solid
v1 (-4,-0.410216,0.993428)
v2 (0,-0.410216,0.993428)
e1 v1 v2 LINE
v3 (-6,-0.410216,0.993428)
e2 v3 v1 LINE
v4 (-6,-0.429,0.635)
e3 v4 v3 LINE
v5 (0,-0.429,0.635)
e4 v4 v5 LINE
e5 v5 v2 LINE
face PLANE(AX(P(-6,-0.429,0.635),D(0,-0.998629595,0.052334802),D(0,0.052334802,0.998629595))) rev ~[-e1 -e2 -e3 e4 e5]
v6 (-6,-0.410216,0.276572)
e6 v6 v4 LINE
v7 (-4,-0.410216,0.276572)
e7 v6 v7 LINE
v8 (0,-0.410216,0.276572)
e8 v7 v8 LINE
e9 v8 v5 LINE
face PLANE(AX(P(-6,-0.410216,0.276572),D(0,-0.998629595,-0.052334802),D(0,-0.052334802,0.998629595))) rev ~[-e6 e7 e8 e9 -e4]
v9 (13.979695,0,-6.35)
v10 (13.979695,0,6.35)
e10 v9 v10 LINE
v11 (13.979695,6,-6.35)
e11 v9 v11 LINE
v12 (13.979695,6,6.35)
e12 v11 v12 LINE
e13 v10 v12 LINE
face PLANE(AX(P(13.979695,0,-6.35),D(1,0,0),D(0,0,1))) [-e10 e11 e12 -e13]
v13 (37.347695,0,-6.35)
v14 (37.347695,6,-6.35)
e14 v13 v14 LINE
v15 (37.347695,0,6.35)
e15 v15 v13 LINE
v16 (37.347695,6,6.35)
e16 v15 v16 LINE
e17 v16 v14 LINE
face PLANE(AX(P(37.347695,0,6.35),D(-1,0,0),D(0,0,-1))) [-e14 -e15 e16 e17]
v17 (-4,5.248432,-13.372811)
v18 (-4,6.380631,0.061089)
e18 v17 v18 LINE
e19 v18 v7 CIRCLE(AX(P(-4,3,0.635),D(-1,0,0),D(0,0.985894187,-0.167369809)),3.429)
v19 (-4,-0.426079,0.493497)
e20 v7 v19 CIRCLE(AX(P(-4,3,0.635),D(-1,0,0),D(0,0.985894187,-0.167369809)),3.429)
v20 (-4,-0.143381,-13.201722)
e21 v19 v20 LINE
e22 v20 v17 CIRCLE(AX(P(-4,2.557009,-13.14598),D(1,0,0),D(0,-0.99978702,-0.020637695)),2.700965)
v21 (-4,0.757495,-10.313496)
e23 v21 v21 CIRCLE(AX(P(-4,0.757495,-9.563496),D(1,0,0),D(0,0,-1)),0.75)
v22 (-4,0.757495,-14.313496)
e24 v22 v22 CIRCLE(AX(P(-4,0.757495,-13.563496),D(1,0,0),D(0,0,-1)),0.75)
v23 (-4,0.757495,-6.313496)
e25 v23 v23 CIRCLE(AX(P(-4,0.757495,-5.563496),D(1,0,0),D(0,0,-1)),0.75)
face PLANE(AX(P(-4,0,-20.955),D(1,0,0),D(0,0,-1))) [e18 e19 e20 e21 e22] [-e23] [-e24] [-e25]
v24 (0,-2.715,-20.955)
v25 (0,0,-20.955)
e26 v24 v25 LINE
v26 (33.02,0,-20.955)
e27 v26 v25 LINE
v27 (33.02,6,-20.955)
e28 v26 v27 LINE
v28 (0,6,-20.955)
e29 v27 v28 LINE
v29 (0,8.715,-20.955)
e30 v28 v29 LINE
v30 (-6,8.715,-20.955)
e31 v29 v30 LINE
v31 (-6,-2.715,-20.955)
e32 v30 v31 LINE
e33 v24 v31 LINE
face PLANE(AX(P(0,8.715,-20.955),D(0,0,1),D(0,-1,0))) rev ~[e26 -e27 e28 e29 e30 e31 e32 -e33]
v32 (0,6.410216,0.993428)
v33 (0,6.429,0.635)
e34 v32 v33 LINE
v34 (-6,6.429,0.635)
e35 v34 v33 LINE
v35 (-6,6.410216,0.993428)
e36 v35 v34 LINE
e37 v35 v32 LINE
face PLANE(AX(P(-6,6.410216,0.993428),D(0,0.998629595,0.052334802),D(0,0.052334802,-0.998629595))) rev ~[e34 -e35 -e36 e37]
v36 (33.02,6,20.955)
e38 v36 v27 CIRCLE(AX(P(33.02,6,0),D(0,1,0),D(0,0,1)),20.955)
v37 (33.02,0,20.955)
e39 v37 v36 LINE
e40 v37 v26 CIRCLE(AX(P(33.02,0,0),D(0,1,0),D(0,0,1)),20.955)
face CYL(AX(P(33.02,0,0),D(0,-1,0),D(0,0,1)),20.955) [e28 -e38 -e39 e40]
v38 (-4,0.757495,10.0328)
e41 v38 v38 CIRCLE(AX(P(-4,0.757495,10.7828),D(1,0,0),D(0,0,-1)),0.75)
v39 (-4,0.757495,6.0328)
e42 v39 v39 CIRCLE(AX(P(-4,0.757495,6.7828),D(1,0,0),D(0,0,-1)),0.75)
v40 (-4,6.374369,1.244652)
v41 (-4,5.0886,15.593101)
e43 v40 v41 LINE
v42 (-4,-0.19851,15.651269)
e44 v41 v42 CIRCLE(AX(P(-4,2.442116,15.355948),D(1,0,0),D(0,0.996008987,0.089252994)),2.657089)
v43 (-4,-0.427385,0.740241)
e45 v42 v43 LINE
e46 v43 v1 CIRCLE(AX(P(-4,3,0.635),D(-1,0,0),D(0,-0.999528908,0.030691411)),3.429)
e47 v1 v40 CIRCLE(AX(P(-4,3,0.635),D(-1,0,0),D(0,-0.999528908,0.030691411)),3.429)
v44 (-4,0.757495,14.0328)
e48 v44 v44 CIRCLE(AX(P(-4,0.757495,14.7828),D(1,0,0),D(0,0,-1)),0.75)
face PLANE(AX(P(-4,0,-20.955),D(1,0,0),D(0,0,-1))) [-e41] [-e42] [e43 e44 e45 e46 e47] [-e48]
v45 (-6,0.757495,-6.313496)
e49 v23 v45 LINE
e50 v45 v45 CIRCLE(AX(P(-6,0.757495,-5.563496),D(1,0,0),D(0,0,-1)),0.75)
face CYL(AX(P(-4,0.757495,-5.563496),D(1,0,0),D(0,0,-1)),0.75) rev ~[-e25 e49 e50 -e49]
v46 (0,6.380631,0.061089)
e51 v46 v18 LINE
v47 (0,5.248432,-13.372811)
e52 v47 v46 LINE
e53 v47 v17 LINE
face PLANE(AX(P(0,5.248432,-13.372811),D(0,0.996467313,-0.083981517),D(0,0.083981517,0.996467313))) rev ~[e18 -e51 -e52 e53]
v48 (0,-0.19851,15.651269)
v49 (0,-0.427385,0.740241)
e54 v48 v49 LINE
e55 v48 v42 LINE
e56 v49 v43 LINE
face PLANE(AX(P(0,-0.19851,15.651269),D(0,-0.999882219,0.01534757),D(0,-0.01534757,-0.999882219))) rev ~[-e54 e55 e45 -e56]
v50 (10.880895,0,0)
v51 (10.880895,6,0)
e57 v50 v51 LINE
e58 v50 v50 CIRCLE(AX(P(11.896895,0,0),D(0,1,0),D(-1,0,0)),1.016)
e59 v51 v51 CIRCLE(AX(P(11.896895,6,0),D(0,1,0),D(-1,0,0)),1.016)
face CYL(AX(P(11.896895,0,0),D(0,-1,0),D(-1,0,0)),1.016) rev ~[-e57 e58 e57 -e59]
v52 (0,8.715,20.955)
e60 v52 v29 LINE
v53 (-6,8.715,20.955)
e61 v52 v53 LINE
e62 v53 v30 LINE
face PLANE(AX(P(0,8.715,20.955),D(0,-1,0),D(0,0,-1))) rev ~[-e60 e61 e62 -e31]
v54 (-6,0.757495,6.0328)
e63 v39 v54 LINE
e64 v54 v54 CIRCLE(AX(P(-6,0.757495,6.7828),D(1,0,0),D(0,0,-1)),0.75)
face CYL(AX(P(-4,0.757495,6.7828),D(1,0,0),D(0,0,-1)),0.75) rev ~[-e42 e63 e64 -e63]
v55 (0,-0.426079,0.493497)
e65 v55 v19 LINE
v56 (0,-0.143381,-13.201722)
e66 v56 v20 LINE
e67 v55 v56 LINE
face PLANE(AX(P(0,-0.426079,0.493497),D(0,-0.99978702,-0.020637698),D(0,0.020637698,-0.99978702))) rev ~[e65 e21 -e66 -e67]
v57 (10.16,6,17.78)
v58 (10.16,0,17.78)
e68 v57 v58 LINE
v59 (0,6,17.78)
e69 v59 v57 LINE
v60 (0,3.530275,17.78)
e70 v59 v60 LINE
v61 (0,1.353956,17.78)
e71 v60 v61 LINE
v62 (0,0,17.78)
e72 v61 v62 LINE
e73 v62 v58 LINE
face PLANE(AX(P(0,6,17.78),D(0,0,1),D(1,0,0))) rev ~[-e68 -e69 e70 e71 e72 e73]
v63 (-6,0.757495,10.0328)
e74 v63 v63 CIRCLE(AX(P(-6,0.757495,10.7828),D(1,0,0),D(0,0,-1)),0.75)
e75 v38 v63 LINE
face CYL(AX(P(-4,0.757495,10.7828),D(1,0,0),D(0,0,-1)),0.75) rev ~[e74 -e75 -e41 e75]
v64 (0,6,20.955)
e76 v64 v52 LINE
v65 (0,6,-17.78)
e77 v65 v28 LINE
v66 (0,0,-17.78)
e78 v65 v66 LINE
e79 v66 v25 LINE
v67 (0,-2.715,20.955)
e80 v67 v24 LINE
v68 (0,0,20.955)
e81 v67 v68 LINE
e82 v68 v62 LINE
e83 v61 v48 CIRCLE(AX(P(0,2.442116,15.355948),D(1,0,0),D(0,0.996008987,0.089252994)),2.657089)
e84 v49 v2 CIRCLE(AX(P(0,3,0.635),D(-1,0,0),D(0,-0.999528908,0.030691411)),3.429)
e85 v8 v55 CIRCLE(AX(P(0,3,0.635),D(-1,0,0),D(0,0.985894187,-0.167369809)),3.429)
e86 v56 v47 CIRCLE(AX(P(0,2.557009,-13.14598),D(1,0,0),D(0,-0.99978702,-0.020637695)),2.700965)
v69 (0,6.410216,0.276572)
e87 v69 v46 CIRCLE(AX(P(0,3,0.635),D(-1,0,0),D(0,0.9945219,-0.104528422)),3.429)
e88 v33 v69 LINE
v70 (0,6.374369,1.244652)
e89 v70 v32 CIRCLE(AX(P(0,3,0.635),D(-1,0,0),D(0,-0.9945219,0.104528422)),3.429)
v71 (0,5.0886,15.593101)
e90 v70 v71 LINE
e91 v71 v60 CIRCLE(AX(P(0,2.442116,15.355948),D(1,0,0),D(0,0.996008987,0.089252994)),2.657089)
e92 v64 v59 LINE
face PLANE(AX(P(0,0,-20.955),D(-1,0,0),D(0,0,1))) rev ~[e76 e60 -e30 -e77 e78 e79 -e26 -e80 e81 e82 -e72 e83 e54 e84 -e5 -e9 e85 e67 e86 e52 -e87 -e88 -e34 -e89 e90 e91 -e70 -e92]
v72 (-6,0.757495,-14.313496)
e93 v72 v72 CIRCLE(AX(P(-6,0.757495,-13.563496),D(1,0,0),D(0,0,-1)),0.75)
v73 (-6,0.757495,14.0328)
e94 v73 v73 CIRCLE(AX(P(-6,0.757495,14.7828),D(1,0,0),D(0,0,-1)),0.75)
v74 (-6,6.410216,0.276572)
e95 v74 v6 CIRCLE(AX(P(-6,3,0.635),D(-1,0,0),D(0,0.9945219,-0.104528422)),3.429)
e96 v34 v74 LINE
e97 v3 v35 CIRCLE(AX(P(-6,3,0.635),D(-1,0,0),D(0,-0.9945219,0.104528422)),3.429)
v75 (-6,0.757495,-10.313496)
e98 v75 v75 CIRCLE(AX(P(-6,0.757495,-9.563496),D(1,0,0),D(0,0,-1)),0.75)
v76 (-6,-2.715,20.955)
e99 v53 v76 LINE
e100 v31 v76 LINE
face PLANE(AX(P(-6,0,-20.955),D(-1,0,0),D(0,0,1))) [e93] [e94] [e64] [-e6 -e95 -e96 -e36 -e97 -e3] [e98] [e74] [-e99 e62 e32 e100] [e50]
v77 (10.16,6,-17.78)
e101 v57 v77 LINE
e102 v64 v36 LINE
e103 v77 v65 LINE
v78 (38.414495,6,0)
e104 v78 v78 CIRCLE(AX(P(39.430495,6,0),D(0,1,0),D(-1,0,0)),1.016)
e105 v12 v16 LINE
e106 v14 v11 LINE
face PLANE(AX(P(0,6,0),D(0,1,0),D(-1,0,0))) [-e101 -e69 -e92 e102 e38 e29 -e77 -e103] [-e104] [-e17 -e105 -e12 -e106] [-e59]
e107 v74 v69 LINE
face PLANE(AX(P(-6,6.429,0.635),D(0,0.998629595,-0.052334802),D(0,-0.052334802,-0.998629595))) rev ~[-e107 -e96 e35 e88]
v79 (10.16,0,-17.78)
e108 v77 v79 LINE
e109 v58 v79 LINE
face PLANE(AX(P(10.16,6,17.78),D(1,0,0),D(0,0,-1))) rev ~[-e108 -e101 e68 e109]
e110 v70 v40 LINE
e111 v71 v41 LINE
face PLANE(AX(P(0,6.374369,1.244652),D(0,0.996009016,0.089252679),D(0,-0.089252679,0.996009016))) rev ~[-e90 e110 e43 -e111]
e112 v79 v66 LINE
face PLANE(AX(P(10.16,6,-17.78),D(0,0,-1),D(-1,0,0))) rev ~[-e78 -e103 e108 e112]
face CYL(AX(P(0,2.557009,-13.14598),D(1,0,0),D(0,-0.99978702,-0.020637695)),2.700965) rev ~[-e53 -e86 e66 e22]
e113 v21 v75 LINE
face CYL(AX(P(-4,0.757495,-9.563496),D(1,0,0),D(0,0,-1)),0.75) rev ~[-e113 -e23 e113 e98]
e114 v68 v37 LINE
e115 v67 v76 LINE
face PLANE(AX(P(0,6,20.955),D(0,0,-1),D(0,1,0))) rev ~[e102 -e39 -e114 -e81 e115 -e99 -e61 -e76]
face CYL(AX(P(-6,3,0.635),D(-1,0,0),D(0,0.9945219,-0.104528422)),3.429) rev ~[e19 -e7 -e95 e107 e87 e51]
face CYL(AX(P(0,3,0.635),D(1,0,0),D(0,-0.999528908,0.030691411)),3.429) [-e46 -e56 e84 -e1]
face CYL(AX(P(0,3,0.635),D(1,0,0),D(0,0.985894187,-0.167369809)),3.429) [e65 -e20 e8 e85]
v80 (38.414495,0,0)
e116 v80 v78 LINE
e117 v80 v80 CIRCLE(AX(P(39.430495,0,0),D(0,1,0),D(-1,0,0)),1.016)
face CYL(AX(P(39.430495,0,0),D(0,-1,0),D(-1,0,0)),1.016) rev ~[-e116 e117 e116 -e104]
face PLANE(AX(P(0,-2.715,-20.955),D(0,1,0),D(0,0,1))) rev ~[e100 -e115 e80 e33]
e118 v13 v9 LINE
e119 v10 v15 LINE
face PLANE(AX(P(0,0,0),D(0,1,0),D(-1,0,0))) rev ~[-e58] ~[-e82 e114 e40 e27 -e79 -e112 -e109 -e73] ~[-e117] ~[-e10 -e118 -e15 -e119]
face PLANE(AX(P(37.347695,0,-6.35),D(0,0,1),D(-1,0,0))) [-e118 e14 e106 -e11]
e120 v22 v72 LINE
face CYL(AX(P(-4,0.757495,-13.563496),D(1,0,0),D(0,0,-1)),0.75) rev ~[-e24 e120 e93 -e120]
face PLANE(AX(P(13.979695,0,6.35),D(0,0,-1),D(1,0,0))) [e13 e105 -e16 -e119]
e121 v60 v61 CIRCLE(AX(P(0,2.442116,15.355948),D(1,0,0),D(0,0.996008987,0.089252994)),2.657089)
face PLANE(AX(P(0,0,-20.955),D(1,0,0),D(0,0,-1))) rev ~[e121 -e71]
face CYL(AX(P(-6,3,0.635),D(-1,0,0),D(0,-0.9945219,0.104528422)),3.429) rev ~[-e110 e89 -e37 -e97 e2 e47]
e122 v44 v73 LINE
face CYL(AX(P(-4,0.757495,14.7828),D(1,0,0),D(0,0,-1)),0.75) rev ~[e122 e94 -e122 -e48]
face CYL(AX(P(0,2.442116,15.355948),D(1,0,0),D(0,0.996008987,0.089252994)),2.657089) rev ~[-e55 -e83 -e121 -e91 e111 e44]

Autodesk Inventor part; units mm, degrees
ref_plane "YZ Plane" through (0, 0, 0) normal (1, 0, 0) x (0, 1, 0)
ref_plane "XZ Plane" through (0, 0, 0) normal (0, 1, 0) x (-1, 0, 0)
ref_plane "XY Plane" through (0, 0, 0) normal (0, 0, 1) x (1, 0, 0)
sketch "Sketch1" plane through (0, 0, 0) normal (0, 1, 0) x (-1, 0, 0)
  arc A0 (-33.02, 20.955) -> (-33.02, -20.955) centre (-33.02, 0) ccw
  line L0 (0, 20.955) -> (-33.02, 20.955)
  line L1 (-33.02, -20.955) -> (0, -20.955)
  line L2 (-13.979695, 6.35) -> (-37.347695, 6.35)
  line L3 (-37.347695, 6.35) -> (-37.347695, -6.35)
  line L4 (-37.347695, -6.35) -> (-13.979695, -6.35)
  line L5 (-13.979695, -6.35) -> (-13.979695, 6.35)
  circle A1 centre (-39.430495, 0) radius 1.016
  circle A2 centre (-11.896895, 0) radius 1.016
  line L6 (0, 20.955) -> (0, -20.955)
  point P0 (0, 0)
  point P1 (0, 0)
  point P2 (-37.347695, 0)
  dimension "d1" = 41.91
  dimension "d3" = 12.7
  dimension "d4" = 23.368
  dimension "d5" = 2.032
  dimension "d6" = 2.032
  dimension "d7" = 2.0828
  dimension "d8" = 2.0828
  dimension "d9" = 6.4105
  dimension "d87" = 33.02
  dimension "d88" = 33.02
extrude "Extrusion1" add sketch "Sketch1" along normal blind 6
sketch "Sketch4" plane through (0, 0, -20.955) normal (-1, 0, 0) x (0, 0, 1)
  line L0 (41.91, 8.715) -> (0, 8.715)
  line L1 (0, 8.715) -> (0, -2.715)
  line L2 (0, -2.715) -> (41.91, -2.715)
  line L3 (41.91, -2.715) -> (41.91, 8.715)
  line L4 (0, 0) -> (41.91, 0) projected
  line L5 (41.91, 0) -> (41.91, 6) projected
  point P0 (20.955, 0)
  point P1 (20.955, -2.715)
  point P2 (20.955, 0)
  point P3 (41.91, 3)
  point P4 (41.91, 3)
  dimension "d43" = 41.91
  dimension "d44" = 11.43
extrude "Extrusion4" add sketch "Sketch4" along normal blind 6
sketch "Sketch8" plane through (0, 6, 0) normal (0, 1, 0) x (1, 0, 0)
  line L0 (0, -17.78) -> (10.16, -17.78)
  line L1 (10.16, -17.78) -> (10.16, 17.78)
  line L2 (10.16, 17.78) -> (0, 17.78)
  line L3 (0, 17.78) -> (0, -17.78)
  line L4 (0, -20.955) -> (0, 20.955) projected
  point P0 (0, 0)
  point P1 (0, 0)
  point P2 (0, 0)
  point P3 (0, 0)
  point P4 (0, 0)
  point P5 (0, 0)
  dimension "d74" = 10.16
  dimension "d75" = 35.56
extrude "Extrusion10" cut sketch "Sketch8" against normal blind 16.999991
sketch "Sketch12" plane through (-6, 0, -20.955) normal (-1, 0, 0) x (0, 0, 1)
  line L0 (0, 8.715) -> (0, -2.715)
  line L1 (41.91, -2.715) -> (41.91, 8.715)
  arc A0 (35.512447, 0.300645) -> (35.512447, 5.699355) centre (35.37098, 3) ccw
  line L2 (21.59, -0.429) -> (35.512447, 0.300645)
  line L3 (21.59, 6.429) -> (35.512447, 5.699355)
  circle A1 centre (21.59, 3) radius 3.429
  line L4 (21.59, -0.429) -> (6.703499, 0.351168)
  line L5 (21.59, 6.429) -> (6.703499, 5.648832)
  arc A2 (6.703499, 5.648832) -> (6.703499, 0.351168) centre (6.842318, 3) ccw
  circle A3 centre (15.187051, 3) radius 0.75
  circle A4 centre (11.187051, 3) radius 0.75
  circle A5 centre (7.187051, 3) radius 0.75
  line L6 (21.59, 10.756719) -> (21.59, -4.756719)
  circle A6 centre (27.992949, 3) radius 0.75
  circle A7 centre (31.992949, 3) radius 0.75
  circle A8 centre (35.992949, 3) radius 0.75
  point P0 (34.925, 2)
  point P1 (34.925, 2)
  point P2 (34.925, 2)
  point P3 (14.859, -1.175)
  point P4 (14.859, 5.175)
  point P5 (34.925, 2)
  point P6 (41.91, 3)
  point P7 (38.07404, 3)
  point P8 (41.91, 3)
  point P9 (21.231572, 6.410216)
  point P10 (21.231572, -0.410216)
  point P11 (21.948428, -0.410216)
  point P12 (21.948428, 6.410216)
  point P13 (6.205131, 2.479358)
  point P14 (9.863981, 3)
  point P15 (5.48634, 2.396716)
  point P16 (4.189851, 3)
  point P17 (0, 3)
  point P18 (0, 3)
  point P19 (41.91, 3)
  dimension "d143" = 6
  dimension "d144" = 6.858
  dimension "d145" = 6
  dimension "d146" = 13.78098
  dimension "d147" = 20.32
  dimension "d156" = 1.5
  dimension "d157" = 1.5
  dimension "d158" = 1.5
  dimension "d159" = 4
  dimension "d160" = 4
  dimension "d161" = 2.9972
  dimension "d162" = 17.40015
sketch "Sketch12 outline for Extrusion13" plane through (-6, 0, -20.955) normal (-1, 0, 0) x (0, 0, 1)
  line L0 (21.59, 6.429) -> (21.231572, 6.410216)
  line L1 (21.948428, 6.410216) -> (21.59, 6.429)
  arc A0 (21.948428, -0.410216) -> (21.948428, 6.410216) centre (21.59, 3) ccw
  line L2 (21.59, -0.429) -> (21.948428, -0.410216)
  line L3 (21.231572, -0.410216) -> (21.59, -0.429)
  arc A1 (21.231572, 6.410216) -> (21.231572, -0.410216) centre (21.59, 3) ccw
extrude "Extrusion13" cut sketch "Sketch12 outline for Extrusion13" against normal blind 8.762492
sketch "Sketch17" plane through (0, 0, -20.955) normal (1, 0, 0) x (0, 0, -1)
  arc A0 (-7.753278, -0.143381) -> (-7.582189, 5.248432) centre (-7.80902, 2.557009) ccw
  line L0 (-21.59, -0.429) -> (-7.753278, -0.143381)
  line L1 (-21.59, 6.429) -> (-7.582189, 5.248432)
  circle A1 centre (-21.59, 3) radius 3.429
  line L2 (-21.59, -0.429) -> (-36.606269, -0.19851)
  line L3 (-21.59, 6.429) -> (-36.548101, 5.0886)
  arc A2 (-36.548101, 5.0886) -> (-36.606269, -0.19851) centre (-36.310948, 2.442116) ccw
  arc A3 (-21.231572, -0.410216) -> (-21.231572, 6.410216) centre (-21.59, 3) ccw
  circle A4 centre (-27.970676, 2.471347) radius 0.75
  circle A5 centre (-31.970676, 2.471347) radius 0.75
  circle A6 centre (-35.970676, 2.471347) radius 0.75
  line L4 (-21.59, 6.429) -> (-21.59, -0.429)
  circle A7 centre (-15.209324, 2.471347) radius 0.75
  circle A8 centre (-11.209324, 2.471347) radius 0.75
  circle A9 centre (-7.209324, 2.471347) radius 0.75
  point P0 (-20.955, 0)
  point P1 (-16.352581, -1.161112)
  point P2 (-16.352581, 5.188888)
  point P3 (-5.109414, 2.471347)
  point P4 (-21.695241, -0.427385)
  point P5 (-22.199652, 6.374369)
  point P6 (-21.016089, 6.380631)
  point P7 (-21.448497, -0.426079)
  point P8 (-30.453399, 2.232188)
  point P9 (-26.794548, 2.471347)
  point P10 (-31.172189, 2.149546)
  point P11 (-38.967876, 2.471347)
  dimension "d150" = 6
  dimension "d151" = 6.858
  dimension "d152" = 6
  dimension "d153" = 13.78098
  dimension "d163" = 1.5
  dimension "d164" = 1.5
  dimension "d165" = 1.5
  dimension "d166" = 4
  dimension "d167" = 4
  dimension "d168" = 2.9972
sketch "Sketch17 outline for Extrusion17" plane through (0, 0, -20.955) normal (1, 0, 0) x (0, 0, -1)
  arc A0 (-36.548101, 5.0886) -> (-36.606269, -0.19851) centre (-36.310948, 2.442116) ccw
  line L0 (-22.199652, 6.374369) -> (-36.548101, 5.0886)
  arc A1 (-21.695241, -0.427385) -> (-22.199652, 6.374369) centre (-21.59, 3) cw
  line L1 (-36.606269, -0.19851) -> (-21.695241, -0.427385)
  arc A2 (-7.753278, -0.143381) -> (-7.582189, 5.248432) centre (-7.80902, 2.557009) ccw
  line L2 (-21.448497, -0.426079) -> (-7.753278, -0.143381)
  arc A3 (-21.016089, 6.380631) -> (-21.448497, -0.426079) centre (-21.59, 3) cw
  line L3 (-7.582189, 5.248432) -> (-21.016089, 6.380631)
extrude "Extrusion17" cut sketch "Sketch17 outline for Extrusion17" against normal blind 4
sketch "Sketch19" plane through (-4, 0, -20.955) normal (1, 0, 0) x (0, 0, -1)
  circle A0 centre (-27.7378, 0.757495) radius 0.75
  circle A1 centre (-31.7378, 0.757495) radius 0.75
  circle A2 centre (-35.7378, 0.757495) radius 0.75
  line L0 (-38.735, 6) -> (-38.735, 3.530276)
  line L1 (-21.564652, 3.265138) -> (-21.564652, -1.203525)
  circle A3 centre (-15.391504, 0.757495) radius 0.75
  circle A4 centre (-11.391504, 0.757495) radius 0.75
  circle A5 centre (-7.391504, 0.757495) radius 0.75
  point P0 (-20.955, 0)
  point P1 (-32.395372, 0.835812)
  point P2 (-31.71002, 0.757495)
  point P3 (-38.735, 1.75317)
  point P4 (-38.735, 4.765138)
  dimension "d169" = 1.5
  dimension "d170" = 1.5
  dimension "d171" = 1.5
  dimension "d172" = 4
  dimension "d173" = 4
  dimension "d174" = 2.9972
extrude "Extrusion18" cut sketch "Sketch19" against normal blind 25.4
properties part number "unions2s3pt"
